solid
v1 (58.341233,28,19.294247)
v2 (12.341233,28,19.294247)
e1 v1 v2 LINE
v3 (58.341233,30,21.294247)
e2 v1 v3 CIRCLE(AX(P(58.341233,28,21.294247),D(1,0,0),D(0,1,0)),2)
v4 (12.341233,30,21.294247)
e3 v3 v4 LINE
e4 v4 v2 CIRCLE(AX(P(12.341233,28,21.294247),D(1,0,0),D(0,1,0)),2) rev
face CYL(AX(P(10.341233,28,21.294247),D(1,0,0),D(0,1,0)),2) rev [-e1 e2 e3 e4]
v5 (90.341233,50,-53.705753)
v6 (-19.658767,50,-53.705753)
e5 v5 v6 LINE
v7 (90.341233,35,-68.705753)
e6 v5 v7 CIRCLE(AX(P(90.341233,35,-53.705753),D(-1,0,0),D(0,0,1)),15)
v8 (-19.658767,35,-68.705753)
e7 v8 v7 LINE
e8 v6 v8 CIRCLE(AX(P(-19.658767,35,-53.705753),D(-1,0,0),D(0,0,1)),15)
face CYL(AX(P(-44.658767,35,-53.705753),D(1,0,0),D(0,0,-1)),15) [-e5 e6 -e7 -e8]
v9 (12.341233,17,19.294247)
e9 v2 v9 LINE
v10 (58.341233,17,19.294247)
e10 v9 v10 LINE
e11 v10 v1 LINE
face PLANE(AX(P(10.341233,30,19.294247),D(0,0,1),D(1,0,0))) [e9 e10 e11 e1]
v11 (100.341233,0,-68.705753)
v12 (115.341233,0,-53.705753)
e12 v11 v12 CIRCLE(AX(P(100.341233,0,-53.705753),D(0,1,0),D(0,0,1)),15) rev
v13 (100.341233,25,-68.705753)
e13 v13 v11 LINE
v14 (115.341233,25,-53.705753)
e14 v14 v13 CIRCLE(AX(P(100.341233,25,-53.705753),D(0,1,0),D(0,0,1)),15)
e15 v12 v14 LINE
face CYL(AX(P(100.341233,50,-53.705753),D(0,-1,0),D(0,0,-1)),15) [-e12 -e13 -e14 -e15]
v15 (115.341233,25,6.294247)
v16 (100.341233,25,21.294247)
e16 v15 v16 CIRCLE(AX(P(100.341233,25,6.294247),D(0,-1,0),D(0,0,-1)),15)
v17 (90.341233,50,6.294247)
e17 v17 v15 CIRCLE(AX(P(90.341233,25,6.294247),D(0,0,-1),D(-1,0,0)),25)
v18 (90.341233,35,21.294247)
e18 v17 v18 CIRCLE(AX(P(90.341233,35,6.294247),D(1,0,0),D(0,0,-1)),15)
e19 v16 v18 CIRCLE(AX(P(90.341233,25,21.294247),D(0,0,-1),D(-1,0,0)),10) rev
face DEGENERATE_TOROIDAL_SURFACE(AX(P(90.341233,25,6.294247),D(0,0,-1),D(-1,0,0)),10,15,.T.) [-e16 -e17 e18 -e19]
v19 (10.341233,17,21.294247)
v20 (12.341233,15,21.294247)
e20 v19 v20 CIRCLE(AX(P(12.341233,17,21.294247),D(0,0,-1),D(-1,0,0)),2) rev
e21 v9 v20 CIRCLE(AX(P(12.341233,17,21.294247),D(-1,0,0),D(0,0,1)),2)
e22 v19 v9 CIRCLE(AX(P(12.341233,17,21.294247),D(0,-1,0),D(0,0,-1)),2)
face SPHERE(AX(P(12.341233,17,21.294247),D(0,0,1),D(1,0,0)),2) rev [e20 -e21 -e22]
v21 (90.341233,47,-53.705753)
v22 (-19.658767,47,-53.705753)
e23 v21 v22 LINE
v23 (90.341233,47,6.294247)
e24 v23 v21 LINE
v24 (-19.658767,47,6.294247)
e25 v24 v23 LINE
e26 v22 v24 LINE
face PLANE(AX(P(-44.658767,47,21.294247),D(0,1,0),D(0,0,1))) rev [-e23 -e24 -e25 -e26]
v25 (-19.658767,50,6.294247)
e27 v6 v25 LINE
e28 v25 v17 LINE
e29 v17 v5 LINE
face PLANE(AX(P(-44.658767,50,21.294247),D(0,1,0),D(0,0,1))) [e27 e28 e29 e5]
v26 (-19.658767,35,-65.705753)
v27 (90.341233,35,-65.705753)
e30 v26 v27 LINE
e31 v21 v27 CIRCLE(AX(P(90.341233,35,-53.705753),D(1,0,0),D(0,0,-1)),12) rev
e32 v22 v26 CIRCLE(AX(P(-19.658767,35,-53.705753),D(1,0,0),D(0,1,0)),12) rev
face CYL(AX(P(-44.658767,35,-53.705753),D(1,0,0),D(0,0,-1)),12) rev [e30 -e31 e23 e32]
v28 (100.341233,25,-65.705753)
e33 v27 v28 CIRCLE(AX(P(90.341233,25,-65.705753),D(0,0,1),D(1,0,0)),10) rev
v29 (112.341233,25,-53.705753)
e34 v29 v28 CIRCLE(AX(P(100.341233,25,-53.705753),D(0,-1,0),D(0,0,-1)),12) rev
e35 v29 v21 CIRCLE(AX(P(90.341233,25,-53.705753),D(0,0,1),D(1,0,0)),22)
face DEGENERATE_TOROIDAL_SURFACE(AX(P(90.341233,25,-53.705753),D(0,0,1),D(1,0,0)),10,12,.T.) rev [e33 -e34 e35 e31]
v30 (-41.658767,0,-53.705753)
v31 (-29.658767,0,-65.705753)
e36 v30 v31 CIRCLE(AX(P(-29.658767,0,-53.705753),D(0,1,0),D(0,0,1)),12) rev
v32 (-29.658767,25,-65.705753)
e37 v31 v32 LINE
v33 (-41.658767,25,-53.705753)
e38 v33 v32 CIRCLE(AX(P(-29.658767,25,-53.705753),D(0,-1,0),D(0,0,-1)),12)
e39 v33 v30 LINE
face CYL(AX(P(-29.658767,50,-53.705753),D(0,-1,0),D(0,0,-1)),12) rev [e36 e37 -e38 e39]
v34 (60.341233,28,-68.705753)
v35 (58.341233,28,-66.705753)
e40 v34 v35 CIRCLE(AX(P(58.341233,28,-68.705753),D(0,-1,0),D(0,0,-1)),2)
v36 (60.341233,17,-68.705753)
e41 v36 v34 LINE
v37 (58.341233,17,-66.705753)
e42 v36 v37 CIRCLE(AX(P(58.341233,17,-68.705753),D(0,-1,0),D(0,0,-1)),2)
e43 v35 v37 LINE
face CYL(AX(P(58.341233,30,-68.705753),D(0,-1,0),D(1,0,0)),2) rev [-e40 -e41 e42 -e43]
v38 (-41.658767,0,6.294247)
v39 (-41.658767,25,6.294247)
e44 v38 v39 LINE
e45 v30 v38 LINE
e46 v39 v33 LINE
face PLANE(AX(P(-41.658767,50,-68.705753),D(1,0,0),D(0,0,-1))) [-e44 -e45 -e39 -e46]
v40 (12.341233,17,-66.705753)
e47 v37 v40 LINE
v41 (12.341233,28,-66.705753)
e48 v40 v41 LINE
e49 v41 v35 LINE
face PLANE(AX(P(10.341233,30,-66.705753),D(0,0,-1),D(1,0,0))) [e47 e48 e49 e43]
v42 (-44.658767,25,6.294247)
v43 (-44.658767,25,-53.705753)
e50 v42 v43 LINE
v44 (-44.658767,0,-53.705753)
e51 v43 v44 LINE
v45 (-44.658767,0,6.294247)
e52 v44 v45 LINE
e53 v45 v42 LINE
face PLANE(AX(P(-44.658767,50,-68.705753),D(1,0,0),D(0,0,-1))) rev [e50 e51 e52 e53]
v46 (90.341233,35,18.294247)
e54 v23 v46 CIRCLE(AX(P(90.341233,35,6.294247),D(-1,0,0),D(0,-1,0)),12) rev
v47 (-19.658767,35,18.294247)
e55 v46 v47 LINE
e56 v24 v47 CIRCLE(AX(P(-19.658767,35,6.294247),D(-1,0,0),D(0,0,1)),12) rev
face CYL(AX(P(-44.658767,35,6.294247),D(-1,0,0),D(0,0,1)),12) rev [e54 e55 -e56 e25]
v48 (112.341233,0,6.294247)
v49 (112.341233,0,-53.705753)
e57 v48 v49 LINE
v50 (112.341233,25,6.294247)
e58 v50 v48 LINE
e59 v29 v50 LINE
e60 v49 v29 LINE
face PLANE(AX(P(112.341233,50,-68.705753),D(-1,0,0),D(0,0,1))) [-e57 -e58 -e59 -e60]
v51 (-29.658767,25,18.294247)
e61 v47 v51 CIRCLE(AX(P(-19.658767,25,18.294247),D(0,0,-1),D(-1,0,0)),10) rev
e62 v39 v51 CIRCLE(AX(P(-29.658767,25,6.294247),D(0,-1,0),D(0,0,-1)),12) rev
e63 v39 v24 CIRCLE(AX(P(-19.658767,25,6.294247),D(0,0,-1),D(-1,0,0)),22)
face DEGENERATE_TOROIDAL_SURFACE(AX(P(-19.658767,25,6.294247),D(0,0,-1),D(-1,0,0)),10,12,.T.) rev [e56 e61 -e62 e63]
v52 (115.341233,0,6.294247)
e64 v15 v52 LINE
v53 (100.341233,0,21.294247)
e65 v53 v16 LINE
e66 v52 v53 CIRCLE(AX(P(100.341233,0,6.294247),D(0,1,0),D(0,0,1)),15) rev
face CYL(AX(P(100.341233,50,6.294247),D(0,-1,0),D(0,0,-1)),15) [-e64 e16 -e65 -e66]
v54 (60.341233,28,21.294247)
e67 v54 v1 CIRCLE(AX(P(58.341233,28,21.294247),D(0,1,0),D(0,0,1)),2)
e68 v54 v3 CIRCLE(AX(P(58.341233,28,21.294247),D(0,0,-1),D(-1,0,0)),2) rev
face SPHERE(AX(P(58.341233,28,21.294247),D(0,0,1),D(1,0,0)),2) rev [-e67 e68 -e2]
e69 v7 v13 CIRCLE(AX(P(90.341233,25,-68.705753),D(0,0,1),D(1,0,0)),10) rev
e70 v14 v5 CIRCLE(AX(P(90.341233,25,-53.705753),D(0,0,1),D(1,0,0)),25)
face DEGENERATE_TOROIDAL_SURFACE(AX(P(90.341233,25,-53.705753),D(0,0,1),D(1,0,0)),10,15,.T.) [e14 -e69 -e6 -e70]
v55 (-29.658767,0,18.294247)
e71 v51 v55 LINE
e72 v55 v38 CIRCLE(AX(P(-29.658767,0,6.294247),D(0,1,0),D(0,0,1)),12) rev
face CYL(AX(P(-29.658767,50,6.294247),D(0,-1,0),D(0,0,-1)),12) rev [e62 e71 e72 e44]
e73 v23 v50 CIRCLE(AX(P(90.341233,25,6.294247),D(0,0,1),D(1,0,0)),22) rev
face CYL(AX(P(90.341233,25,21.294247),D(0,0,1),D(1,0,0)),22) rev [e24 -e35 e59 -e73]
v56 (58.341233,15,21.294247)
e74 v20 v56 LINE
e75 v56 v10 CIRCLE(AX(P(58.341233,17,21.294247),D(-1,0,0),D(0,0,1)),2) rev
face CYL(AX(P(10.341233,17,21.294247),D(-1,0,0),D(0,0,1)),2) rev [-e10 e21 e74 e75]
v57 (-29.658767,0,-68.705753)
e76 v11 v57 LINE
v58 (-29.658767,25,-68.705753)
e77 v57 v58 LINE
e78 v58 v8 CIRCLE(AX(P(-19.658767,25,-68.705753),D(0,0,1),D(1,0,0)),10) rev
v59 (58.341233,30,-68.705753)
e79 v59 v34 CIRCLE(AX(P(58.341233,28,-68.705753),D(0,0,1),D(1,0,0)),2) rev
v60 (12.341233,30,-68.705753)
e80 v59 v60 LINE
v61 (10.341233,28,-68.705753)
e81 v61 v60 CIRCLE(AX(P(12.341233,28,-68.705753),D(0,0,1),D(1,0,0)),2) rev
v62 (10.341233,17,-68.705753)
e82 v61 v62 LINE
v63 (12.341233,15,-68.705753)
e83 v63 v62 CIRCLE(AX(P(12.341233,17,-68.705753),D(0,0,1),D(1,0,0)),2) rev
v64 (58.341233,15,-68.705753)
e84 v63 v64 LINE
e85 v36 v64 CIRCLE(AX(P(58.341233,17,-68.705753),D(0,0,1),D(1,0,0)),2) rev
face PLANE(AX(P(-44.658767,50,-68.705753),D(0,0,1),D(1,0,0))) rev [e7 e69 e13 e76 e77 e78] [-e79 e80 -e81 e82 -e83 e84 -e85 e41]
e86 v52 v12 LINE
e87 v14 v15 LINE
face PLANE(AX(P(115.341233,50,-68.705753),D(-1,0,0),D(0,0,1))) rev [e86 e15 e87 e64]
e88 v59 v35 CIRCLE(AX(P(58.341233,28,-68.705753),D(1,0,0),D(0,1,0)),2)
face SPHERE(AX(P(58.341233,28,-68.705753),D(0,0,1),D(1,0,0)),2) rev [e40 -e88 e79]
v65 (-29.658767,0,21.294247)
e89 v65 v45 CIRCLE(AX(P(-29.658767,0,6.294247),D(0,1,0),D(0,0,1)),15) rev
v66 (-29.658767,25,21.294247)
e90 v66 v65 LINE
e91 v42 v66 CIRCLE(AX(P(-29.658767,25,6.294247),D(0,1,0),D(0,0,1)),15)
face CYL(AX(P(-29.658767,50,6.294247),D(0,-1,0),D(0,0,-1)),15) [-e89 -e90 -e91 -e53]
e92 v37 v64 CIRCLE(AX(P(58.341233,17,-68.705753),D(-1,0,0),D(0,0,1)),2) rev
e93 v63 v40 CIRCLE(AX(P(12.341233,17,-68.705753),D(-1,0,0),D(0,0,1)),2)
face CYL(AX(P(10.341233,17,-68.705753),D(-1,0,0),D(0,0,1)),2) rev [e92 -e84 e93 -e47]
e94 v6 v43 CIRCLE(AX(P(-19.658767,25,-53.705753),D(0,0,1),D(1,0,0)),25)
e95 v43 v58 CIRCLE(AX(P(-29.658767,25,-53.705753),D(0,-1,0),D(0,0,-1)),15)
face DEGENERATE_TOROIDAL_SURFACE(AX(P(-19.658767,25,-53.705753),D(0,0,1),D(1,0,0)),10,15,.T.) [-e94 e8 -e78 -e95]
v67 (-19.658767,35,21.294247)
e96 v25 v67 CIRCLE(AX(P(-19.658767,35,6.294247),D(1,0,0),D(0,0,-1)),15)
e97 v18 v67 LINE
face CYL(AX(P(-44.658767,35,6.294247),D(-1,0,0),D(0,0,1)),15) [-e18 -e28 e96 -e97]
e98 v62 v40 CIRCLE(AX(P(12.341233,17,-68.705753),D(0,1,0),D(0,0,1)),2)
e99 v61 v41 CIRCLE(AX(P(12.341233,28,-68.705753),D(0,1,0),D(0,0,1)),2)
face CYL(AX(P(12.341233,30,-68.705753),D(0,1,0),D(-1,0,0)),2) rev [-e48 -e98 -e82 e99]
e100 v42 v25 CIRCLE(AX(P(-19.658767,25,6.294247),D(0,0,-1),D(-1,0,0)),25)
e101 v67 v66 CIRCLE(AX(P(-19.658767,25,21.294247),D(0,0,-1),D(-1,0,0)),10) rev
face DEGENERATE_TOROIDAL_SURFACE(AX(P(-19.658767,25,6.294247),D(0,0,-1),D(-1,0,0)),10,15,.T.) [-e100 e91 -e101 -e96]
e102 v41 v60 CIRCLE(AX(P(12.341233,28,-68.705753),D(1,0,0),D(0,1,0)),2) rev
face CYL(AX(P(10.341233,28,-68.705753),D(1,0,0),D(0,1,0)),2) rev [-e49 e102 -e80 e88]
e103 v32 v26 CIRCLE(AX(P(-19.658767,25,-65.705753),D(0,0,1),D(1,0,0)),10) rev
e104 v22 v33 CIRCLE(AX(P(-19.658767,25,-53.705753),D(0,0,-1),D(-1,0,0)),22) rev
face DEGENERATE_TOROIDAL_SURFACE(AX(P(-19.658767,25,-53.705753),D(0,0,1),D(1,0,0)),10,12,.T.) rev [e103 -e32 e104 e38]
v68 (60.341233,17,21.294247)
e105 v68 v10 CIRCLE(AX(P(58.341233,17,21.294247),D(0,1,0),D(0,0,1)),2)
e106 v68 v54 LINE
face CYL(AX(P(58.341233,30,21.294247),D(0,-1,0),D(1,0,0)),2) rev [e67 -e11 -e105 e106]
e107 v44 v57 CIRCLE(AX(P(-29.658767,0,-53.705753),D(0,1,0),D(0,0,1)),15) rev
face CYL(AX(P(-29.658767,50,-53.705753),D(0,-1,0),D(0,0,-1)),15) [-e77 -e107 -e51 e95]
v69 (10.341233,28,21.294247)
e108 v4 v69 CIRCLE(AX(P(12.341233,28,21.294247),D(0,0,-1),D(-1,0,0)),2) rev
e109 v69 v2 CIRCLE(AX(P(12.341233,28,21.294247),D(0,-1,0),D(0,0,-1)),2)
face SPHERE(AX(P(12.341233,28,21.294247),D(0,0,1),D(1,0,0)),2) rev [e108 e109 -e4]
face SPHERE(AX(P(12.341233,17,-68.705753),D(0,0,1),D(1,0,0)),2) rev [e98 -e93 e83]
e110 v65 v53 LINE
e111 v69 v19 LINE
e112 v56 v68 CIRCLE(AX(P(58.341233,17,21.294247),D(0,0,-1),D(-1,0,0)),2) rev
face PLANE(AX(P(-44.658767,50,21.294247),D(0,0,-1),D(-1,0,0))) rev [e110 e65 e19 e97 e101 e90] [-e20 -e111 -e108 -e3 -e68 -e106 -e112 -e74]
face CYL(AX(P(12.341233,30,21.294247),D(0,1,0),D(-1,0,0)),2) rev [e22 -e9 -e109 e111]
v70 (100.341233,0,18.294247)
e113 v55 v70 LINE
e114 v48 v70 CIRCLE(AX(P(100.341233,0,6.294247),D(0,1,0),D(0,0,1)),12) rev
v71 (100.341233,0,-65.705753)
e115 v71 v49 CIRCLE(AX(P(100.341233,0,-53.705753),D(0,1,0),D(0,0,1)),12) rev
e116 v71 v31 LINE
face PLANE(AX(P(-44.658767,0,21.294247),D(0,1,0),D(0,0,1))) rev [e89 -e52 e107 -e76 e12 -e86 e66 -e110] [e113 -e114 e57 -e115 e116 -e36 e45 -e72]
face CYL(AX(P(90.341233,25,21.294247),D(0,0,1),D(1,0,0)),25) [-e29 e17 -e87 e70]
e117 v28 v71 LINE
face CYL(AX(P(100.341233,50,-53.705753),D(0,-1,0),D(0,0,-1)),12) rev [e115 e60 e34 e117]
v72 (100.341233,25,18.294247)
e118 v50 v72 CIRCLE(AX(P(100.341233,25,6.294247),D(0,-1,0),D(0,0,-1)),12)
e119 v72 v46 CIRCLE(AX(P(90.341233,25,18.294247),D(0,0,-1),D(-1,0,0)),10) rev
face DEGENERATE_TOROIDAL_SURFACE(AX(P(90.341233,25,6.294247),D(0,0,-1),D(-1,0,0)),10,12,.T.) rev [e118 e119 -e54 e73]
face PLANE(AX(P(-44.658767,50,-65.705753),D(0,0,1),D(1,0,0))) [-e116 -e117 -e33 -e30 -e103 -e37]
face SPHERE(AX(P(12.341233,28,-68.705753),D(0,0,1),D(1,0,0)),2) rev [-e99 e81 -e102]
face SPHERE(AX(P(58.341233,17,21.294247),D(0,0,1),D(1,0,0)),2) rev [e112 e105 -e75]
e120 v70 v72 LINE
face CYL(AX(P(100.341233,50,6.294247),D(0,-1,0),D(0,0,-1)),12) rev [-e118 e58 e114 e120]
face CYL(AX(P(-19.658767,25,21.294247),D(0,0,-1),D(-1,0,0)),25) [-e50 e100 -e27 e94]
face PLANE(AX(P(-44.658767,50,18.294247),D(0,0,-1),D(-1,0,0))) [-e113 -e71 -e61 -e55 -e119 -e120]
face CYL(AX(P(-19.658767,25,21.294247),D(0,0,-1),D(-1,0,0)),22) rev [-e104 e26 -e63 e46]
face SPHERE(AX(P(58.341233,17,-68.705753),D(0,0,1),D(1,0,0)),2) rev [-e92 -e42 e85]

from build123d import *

# Parameters (mm, degrees)
ESQUISSE1_W             = 160
ESQUISSE1_H             = 90
EXTRUSION1_DEPTH        = 50
CONG_1_R                = 25
CONG_2_R                = 15
COQUE1_T                = -3
ESQUISSE2_W             = 50
ESQUISSE2_H             = 15
ENL_V_MAT_EXTRU_1_DEPTH = 2
CONG_4_R                = 2
CONG_5_R                = 2
CONG_6_R                = 2
CONG_7_R                = 2
CONG_4_OF_SYM_TRIE1_R   = 2
CONG_5_OF_SYM_TRIE1_R   = 2
CONG_6_OF_SYM_TRIE1_R   = 2
CONG_7_OF_SYM_TRIE1_R   = 2


with BuildPart() as part:
    # Esquisse1 → Extrusion1 (new body)
    with BuildSketch(Plane(origin=(0, 0, 0), x_dir=(1, 0, 0), z_dir=(0, 1, 0))):
        with Locations((35.341232877, 23.705753425)):
            Rectangle(ESQUISSE1_W, ESQUISSE1_H)
    extrude(amount=EXTRUSION1_DEPTH)

    # Congé1
    cong_1_edges = [part.edges().sort_by_distance(p)[0] for p in [
        (115.341232877, 50, -23.705753425),
        (-44.658767123, 50, -23.705753425),
    ]]
    fillet(cong_1_edges, radius=CONG_1_R)

    # Congé2
    cong_2_edges = [part.edges().sort_by_distance(p)[0] for p in [
        (35.341232877, 50, 21.294246575),
        (35.341232877, 50, -68.705753425),
        (115.341232877, 12.5, 21.294246575),
        (-44.658767123, 12.5, 21.294246575),
        (108.018902406, 42.67766953, 21.294246575),
        (-37.336436653, 42.67766953, 21.294246575),
        (-44.658767123, 12.5, -68.705753425),
        (115.341232877, 12.5, -68.705753425),
        (108.018902406, 42.67766953, -68.705753425),
        (-37.336436653, 42.67766953, -68.705753425),
    ]]
    fillet(cong_2_edges, radius=CONG_2_R)

    # Coque1
    coque1_openings = [part.faces().sort_by_distance(p)[0] for p in [
        (35.341232877, 0, -23.705753425),
    ]]
    offset(amount=COQUE1_T, openings=coque1_openings, kind=Kind.INTERSECTION)

    # Esquisse2 → Enlèv. mat.-Extru.1 (cut)
    with BuildSketch(Plane.XY.offset(21.294246575)):
        with Locations((35.341232877, 22.5)):
            Rectangle(ESQUISSE2_W, ESQUISSE2_H)
    enl_v_mat_extru_1 = extrude(amount=-ENL_V_MAT_EXTRU_1_DEPTH, mode=Mode.SUBTRACT)

    # Congé4
    cong_4_edges = [part.edges().sort_by_distance(p)[0] for p in [
        (35.341232877, 15, 19.294246575),
    ]]
    fillet(cong_4_edges, radius=CONG_4_R - 0.0001)  # a hair under: the kernel refuses the full size

    # Congé5
    cong_5_edges = [part.edges().sort_by_distance(p)[0] for p in [
        (35.341232877, 30, 19.294246575),
    ]]
    fillet(cong_5_edges, radius=CONG_5_R - 0.0001)  # a hair under: the kernel refuses the full size

    # Congé6
    cong_6_edges = [part.edges().sort_by_distance(p)[0] for p in [
        (10.341232877, 15.585757148, 19.880003724),
        (10.341232877, 22.5, 19.294246575),
        (10.341232877, 29.414242852, 19.880003724),
    ]]
    fillet(cong_6_edges, radius=CONG_6_R - 0.0001)  # a hair under: the kernel refuses the full size

    # Congé7
    cong_7_edges = [part.edges().sort_by_distance(p)[0] for p in [
        (60.341232877, 22.5, 19.294246575),
        (60.341232877, 15.585757148, 19.880003724),
        (60.341232877, 29.414242852, 19.880003724),
    ]]
    fillet(cong_7_edges, radius=CONG_7_R - 0.0001)  # a hair under: the kernel refuses the full size

    # Symétrie1: Enlèv. mat.-Extru.1 across plane
    add(enl_v_mat_extru_1.mirror(Plane.XY.offset(-23.705753425)), mode=Mode.SUBTRACT)

    # Congé4 of Symétrie1
    cong_4_of_sym_trie1_edges = [part.edges().sort_by_distance(p)[0] for p in [
        (35.341232877, 15, -66.705753425),
    ]]
    fillet(cong_4_of_sym_trie1_edges, radius=CONG_4_OF_SYM_TRIE1_R - 0.0001)  # a hair under: the kernel refuses the full size

    # Congé5 of Symétrie1
    cong_5_of_sym_trie1_edges = [part.edges().sort_by_distance(p)[0] for p in [
        (35.341232877, 30, -66.705753425),
    ]]
    fillet(cong_5_of_sym_trie1_edges, radius=CONG_5_OF_SYM_TRIE1_R - 0.0001)  # a hair under: the kernel refuses the full size

    # Congé6 of Symétrie1
    cong_6_of_sym_trie1_edges = [part.edges().sort_by_distance(p)[0] for p in [
        (10.341232877, 15.585757148, -67.291510573),
        (10.341232877, 22.5, -66.705753425),
        (10.341232877, 29.414242852, -67.291510573),
    ]]
    fillet(cong_6_of_sym_trie1_edges, radius=CONG_6_OF_SYM_TRIE1_R - 0.0001)  # a hair under: the kernel refuses the full size

    # Congé7 of Symétrie1
    cong_7_of_sym_trie1_edges = [part.edges().sort_by_distance(p)[0] for p in [
        (60.341232877, 22.5, -66.705753425),
        (60.341232877, 15.585757148, -67.291510573),
        (60.341232877, 29.414242852, -67.291510573),
    ]]
    fillet(cong_7_of_sym_trie1_edges, radius=CONG_7_OF_SYM_TRIE1_R - 0.0001)  # a hair under: the kernel refuses the full size


solid = part.part
